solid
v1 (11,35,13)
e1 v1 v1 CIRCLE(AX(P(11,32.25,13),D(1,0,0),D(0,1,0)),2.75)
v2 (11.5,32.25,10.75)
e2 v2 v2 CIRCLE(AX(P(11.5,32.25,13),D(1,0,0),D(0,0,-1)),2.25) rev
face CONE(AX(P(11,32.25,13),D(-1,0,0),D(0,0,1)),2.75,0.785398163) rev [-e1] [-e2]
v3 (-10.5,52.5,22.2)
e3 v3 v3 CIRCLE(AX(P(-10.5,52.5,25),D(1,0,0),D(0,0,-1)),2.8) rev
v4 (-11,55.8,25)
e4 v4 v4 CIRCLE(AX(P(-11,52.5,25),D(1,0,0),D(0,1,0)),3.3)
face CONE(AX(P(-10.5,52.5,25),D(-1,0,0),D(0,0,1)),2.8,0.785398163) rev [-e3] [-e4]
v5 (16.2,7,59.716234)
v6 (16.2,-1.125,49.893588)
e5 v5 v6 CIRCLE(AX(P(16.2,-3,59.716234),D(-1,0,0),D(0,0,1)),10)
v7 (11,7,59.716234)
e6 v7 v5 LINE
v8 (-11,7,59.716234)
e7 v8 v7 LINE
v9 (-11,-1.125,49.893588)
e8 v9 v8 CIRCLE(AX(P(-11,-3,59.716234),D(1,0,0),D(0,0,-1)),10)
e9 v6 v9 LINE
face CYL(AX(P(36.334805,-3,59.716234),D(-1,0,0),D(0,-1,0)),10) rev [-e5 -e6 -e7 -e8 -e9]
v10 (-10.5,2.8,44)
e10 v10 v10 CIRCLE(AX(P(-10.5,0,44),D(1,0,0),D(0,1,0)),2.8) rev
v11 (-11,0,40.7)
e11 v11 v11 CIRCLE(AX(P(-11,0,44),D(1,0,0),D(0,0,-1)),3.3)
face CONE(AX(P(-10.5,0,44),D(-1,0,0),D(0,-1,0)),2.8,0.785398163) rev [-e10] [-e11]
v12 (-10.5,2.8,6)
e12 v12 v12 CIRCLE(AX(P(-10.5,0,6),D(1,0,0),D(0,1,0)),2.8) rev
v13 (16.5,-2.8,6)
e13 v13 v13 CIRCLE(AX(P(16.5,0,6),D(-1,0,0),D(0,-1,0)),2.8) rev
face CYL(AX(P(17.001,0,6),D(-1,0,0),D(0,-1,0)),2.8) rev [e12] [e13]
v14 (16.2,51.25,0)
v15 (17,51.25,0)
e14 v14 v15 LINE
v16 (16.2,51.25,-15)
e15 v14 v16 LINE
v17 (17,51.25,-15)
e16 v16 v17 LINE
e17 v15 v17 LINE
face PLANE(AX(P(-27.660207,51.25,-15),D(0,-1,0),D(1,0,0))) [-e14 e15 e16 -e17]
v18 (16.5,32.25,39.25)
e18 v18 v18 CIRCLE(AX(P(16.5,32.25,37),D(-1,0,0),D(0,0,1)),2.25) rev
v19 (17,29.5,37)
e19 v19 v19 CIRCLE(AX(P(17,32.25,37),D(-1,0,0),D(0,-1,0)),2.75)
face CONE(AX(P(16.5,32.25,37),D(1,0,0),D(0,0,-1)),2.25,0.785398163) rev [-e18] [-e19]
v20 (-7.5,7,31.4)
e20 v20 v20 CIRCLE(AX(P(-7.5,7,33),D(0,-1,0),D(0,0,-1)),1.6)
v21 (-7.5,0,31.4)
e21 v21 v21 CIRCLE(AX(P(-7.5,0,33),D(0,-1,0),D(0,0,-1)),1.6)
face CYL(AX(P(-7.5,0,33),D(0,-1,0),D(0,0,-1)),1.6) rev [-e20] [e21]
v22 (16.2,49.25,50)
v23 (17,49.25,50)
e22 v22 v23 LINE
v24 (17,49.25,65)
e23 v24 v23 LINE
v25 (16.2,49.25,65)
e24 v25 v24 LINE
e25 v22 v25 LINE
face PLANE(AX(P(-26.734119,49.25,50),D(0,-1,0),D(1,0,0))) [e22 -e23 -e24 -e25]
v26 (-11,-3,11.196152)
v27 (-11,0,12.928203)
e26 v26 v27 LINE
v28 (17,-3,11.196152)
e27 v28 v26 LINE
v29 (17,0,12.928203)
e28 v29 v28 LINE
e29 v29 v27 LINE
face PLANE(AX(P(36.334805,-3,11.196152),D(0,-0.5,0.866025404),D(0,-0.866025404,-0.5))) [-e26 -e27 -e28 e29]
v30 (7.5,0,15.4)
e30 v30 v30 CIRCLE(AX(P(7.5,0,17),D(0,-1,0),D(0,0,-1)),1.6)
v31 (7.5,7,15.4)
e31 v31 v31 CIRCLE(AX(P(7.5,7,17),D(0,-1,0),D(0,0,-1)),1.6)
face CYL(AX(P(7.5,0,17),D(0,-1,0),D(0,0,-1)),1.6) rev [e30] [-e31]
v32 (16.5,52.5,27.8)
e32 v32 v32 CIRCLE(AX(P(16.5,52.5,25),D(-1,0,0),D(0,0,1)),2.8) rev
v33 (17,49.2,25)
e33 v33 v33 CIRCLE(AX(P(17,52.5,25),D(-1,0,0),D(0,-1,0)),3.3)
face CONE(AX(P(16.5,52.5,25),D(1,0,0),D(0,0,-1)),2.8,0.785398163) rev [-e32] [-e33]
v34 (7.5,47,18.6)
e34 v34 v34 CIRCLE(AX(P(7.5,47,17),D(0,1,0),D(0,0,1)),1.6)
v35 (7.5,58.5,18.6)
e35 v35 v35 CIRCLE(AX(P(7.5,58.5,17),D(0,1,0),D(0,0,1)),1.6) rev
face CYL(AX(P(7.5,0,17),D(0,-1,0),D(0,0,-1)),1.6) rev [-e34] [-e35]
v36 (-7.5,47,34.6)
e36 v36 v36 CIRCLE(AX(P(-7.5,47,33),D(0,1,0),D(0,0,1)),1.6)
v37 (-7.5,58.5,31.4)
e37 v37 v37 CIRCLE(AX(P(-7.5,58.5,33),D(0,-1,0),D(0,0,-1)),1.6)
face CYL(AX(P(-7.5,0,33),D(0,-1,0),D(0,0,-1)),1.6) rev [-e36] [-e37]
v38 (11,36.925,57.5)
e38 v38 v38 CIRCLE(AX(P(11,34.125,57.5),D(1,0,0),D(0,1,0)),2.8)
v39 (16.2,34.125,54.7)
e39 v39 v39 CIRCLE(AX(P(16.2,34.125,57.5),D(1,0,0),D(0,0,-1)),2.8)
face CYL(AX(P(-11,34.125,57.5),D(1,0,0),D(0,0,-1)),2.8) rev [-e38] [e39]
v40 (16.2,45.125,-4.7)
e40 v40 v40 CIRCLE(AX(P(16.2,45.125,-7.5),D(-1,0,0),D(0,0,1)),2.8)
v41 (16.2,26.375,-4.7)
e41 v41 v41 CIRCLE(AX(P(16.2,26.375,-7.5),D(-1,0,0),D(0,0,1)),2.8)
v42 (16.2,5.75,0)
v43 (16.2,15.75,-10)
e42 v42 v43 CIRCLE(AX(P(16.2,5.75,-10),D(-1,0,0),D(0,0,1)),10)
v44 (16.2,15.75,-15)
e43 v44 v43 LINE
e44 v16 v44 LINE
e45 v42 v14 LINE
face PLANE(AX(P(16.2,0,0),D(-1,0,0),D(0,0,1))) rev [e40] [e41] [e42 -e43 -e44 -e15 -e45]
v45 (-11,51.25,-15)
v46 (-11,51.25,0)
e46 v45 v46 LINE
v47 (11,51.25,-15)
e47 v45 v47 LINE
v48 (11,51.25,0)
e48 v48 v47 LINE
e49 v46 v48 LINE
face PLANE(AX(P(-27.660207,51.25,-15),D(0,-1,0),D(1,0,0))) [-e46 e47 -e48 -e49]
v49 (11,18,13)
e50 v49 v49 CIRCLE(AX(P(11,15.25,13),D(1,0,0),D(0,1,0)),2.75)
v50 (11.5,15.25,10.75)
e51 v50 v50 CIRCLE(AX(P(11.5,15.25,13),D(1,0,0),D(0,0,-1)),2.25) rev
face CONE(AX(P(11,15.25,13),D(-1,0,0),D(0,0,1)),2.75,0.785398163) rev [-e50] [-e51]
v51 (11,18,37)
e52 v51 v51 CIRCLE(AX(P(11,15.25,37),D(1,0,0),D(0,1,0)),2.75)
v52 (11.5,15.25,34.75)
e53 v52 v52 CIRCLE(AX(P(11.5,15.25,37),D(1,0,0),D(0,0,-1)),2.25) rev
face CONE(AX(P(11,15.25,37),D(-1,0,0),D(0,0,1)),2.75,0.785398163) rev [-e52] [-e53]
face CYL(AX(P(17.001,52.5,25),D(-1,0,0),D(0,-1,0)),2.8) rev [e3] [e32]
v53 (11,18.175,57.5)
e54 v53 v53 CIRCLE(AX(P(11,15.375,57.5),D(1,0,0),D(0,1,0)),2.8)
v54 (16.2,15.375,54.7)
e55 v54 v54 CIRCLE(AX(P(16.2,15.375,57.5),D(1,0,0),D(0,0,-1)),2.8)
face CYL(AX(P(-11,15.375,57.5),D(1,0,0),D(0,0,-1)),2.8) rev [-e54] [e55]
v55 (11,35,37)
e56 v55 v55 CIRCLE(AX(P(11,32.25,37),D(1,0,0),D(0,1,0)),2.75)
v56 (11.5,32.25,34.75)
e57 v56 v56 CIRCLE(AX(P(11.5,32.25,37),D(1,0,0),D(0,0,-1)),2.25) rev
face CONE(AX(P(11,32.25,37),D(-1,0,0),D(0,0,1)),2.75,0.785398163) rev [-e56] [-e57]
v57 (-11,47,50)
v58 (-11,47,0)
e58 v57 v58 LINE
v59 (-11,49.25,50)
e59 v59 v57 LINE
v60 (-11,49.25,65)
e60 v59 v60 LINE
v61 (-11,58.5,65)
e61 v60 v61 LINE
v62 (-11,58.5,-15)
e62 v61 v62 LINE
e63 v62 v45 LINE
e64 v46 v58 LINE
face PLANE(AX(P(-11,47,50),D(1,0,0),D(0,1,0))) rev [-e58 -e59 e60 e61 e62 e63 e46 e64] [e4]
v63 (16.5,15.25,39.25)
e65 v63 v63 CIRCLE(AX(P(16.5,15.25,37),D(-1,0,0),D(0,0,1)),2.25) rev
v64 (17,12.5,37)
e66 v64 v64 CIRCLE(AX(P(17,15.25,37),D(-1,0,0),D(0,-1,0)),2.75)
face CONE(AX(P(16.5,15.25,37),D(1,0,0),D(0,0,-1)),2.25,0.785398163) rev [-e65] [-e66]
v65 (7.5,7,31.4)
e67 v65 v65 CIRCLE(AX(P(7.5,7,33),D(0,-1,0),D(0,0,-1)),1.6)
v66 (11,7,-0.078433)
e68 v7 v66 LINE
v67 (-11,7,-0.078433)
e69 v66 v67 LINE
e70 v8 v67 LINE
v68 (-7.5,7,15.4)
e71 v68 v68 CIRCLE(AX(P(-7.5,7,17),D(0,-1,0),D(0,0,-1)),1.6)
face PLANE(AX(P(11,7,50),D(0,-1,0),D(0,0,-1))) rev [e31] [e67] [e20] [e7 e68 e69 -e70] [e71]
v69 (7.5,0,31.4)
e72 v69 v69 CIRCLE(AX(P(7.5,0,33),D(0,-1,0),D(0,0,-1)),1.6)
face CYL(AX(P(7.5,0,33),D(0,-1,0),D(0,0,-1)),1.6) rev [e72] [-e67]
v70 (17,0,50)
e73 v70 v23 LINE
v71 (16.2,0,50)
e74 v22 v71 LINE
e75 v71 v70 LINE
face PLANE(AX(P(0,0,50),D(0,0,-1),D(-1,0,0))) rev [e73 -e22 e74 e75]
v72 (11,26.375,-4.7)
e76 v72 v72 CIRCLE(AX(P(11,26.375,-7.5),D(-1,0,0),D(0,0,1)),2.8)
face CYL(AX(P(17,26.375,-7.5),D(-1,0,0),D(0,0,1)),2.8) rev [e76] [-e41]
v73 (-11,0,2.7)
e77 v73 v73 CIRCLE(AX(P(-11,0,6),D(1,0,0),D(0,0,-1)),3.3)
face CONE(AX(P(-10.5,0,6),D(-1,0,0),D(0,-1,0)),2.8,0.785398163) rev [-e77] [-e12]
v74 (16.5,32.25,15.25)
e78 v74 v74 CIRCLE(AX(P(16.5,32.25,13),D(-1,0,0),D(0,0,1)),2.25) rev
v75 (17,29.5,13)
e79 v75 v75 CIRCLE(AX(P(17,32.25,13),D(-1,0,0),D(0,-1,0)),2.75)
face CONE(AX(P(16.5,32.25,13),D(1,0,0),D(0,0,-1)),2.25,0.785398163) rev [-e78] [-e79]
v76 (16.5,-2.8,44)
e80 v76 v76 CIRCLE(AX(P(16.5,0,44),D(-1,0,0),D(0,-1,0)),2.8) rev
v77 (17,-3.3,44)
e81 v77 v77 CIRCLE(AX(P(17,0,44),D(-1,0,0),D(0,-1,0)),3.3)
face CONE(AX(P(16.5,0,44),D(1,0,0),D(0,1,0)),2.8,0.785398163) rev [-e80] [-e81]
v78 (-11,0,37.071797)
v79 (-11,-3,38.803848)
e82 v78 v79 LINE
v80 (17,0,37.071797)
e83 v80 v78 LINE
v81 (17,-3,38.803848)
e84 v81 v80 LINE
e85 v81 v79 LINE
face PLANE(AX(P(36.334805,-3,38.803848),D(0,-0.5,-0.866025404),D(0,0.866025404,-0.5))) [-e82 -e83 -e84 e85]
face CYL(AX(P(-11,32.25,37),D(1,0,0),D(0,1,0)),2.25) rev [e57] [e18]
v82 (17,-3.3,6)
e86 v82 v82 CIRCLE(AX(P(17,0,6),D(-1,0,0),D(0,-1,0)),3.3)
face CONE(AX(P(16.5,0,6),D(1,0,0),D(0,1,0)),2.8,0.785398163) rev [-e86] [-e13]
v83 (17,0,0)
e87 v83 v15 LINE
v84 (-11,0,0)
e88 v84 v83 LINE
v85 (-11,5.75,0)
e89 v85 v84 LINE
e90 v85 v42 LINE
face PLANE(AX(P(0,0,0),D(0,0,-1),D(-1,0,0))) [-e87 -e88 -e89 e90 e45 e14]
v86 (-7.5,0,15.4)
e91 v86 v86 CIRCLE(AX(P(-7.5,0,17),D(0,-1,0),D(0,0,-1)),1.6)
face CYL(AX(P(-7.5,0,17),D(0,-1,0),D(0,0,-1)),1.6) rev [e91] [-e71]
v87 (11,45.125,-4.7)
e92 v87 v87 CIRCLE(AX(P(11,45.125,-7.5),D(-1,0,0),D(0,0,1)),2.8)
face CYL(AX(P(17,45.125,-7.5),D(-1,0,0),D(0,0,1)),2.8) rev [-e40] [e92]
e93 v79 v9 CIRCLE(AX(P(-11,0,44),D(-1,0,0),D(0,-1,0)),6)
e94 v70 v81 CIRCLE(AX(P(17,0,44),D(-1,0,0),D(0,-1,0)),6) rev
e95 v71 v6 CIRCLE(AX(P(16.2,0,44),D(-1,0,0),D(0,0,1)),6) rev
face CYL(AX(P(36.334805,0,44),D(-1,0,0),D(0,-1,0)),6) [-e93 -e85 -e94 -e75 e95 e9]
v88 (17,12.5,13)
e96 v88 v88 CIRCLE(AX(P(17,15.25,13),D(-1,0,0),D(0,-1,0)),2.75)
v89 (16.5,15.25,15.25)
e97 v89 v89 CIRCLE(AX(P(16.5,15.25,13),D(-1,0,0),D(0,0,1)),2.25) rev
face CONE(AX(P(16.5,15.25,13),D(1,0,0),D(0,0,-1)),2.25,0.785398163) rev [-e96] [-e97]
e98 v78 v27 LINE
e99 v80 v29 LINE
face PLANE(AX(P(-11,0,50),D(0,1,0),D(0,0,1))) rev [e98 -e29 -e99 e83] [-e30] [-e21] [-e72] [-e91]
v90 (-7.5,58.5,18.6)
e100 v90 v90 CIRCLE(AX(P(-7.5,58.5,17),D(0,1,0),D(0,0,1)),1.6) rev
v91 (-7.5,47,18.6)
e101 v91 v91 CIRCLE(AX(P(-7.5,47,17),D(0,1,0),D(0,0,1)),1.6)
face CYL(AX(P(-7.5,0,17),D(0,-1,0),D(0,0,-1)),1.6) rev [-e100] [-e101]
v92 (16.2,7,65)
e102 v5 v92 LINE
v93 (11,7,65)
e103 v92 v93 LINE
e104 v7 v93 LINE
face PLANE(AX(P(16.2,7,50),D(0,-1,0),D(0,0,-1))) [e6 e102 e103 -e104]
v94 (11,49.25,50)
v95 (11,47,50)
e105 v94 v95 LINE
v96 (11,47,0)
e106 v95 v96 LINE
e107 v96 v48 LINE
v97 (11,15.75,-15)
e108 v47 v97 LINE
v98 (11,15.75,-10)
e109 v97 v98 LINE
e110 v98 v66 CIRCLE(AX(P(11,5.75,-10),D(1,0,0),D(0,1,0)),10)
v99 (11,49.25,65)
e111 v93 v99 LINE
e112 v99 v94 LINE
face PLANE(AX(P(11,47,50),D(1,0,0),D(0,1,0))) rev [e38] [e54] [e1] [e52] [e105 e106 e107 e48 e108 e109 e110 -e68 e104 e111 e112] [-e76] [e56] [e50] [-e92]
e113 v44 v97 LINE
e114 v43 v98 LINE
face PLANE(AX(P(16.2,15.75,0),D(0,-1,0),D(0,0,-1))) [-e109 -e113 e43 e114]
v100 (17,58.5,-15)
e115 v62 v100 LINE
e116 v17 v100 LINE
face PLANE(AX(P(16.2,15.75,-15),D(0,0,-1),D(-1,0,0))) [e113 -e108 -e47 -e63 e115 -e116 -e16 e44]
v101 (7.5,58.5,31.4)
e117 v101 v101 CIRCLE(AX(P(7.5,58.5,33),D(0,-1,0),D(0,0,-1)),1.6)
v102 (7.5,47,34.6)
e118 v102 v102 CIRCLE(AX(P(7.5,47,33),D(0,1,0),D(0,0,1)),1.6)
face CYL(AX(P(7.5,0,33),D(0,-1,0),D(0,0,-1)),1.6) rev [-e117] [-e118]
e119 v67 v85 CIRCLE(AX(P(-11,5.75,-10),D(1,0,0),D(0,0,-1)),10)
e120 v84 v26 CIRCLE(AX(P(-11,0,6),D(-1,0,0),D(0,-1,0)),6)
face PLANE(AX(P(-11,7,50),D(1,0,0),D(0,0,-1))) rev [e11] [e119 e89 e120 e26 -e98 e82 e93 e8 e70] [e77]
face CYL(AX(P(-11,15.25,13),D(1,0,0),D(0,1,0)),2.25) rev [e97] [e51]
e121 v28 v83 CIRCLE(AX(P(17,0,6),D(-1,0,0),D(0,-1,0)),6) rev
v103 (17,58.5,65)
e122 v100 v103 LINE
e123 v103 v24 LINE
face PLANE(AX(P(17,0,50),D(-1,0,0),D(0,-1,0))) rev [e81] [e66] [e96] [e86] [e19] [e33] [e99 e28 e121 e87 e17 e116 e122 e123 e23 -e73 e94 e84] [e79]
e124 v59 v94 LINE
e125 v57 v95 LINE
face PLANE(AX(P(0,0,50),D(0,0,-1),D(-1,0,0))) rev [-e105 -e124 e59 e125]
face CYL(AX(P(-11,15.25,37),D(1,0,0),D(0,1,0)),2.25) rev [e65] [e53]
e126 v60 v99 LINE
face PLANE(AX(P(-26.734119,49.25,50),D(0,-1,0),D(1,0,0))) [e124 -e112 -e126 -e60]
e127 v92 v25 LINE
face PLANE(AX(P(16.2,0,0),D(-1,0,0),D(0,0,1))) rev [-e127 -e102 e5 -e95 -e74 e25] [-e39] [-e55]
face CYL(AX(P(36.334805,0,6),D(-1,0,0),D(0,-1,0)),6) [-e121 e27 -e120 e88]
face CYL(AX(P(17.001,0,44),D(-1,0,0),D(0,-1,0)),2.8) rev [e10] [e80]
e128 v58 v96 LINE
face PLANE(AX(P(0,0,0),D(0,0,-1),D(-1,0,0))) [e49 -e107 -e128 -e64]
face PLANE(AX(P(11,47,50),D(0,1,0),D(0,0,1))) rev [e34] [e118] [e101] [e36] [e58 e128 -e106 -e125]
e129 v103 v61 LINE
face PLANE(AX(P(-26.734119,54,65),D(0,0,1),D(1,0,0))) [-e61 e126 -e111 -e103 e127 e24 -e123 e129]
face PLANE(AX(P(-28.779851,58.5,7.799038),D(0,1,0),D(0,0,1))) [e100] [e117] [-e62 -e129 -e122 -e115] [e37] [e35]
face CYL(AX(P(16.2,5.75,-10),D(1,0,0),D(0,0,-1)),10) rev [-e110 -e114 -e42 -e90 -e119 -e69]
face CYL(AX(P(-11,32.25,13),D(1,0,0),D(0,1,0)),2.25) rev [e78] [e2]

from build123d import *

# Parameters (mm, degrees)
BOSS_EXTRUDE1_DEPTH        = 50
F_3_2_3_2_DIAMETER_HOLE1_D = 3.2
SKETCH5_R                  = 2.25
CUT_EXTRUDE1_DEPTH         = 79.74007874
SKETCH6_W                  = 15
SKETCH6_H                  = 4.75
BOSS_EXTRUDE2_DEPTH        = 28
SKETCH8_W                  = 12.2
SKETCH8_H                  = 80
BOSS_EXTRUDE3_DEPTH        = 25
SKETCH9_R                  = 2.75
CUT_EXTRUDE2_DEPTH         = 105.770033884
BOSS_EXTRUDE4_REACH        = 108.066
CUT_EXTRUDE3_REACH         = 108.066
SKETCH11_R                 = 2.8
CHAMFER1_SIZE              = 0.5
CUT_EXTRUDE4_DEPTH         = 104.806358187
SKETCH14_W                 = 15
SKETCH14_H                 = 40
BOSS_EXTRUDE5_DEPTH        = 5.2
SKETCH16_W                 = 15
SKETCH16_H                 = 17
CUT_EXTRUDE6_DEPTH         = 92.821838361
SKETCH18_W                 = 15
SKETCH18_H                 = 35.5
BOSS_EXTRUDE6_DEPTH        = 5.2
SKETCH20_W                 = 7.799038106
SKETCH20_H                 = 4.25
BOSS_EXTRUDE7_DEPTH        = 27.2
FILLET1_R                  = 10
SKETCH22_R                 = 2.8
CUT_EXTRUDE8_DEPTH         = 92.581056993
SKETCH24_R                 = 2.8
CUT_EXTRUDE9_DEPTH         = 91.173443984
BOSS_EXTRUDE9_START        = -28
BOSS_EXTRUDE9_DEPTH        = 28
CUT_EXTRUDE11_START        = 10
SKETCH29_R                 = 3.75
SKETCH29_R_2               = 1.6
CUT_EXTRUDE11_DEPTH        = 10
SKETCH28_W                 = 15
SKETCH28_H                 = 2.25
BOSS_EXTRUDE10_DEPTH       = 5.2
SKETCH30_W                 = 7.799038106
SKETCH30_H                 = 4.5
BOSS_EXTRUDE11_DEPTH       = 28
SKETCH31_W                 = 15
SKETCH31_H                 = 7.25
BOSS_EXTRUDE12_DEPTH       = 28
BOSS_EXTRUDE14_DEPTH       = 28
SKETCH33_R                 = 1.6
CUT_EXTRUDE12_DEPTH        = 86.574528921


with BuildPart() as part:
    # Sketch1 → Boss-Extrude1 (new body)
    with BuildSketch(Plane.XY):
        Polygon((-11, 0), (17, 0), (17, 54), (-11, 54), (-11, 47), (11, 47), (11, 7), (-11, 7), align=None)
    extrude(amount=BOSS_EXTRUDE1_DEPTH)

    # Ø3.2 (3.2) Diameter Hole1 (through all)
    with Locations(Plane(origin=(0, 0, 0), x_dir=(-1, 0, 0), z_dir=(0, -1, 0))):
        with Locations((-7.5, -17), (7.5, -17), (7.5, -33), (-7.5, -33)):
            Hole(F_3_2_3_2_DIAMETER_HOLE1_D / 2)

    # Sketch5 → Cut-Extrude1 (cut, through all)
    with BuildSketch(Plane(origin=(17, 0, 0), x_dir=(0, 0, -1), z_dir=(1, 0, 0))):
        with Locations(Location((-37, 32.25, 0), (0, 0, 90))):
            Circle(SKETCH5_R)
        with Locations(Location((-13, 32.25, 0), (0, 0, 90))):
            Circle(SKETCH5_R)
        with Locations(Location((-37, 15.25, 0), (0, 0, 90))):
            Circle(SKETCH5_R)
        with Locations(Location((-13, 15.25, 0), (0, 0, 90))):
            Circle(SKETCH5_R)
    extrude(amount=-CUT_EXTRUDE1_DEPTH, mode=Mode.SUBTRACT)

    # Sketch6 → Boss-Extrude2 (add)
    with BuildSketch(Plane(origin=(17, 0, 0), x_dir=(0, 0, -1), z_dir=(1, 0, 0))):
        with Locations((-57.5, 51.625)):
            Rectangle(SKETCH6_W, SKETCH6_H)
        with Locations((7.5, 51.625)):
            Rectangle(SKETCH6_W, SKETCH6_H)
    extrude(amount=-BOSS_EXTRUDE2_DEPTH)

    # Sketch8 → Boss-Extrude3 (add)
    with BuildSketch(Plane(origin=(0, 54, 0), x_dir=(1, 0, 0), z_dir=(0, 1, 0))):
        with Locations((0.5, -25)):
            Rectangle(SKETCH8_W, SKETCH8_H)
    extrude(amount=BOSS_EXTRUDE3_DEPTH)

    # Sketch9 → Cut-Extrude2 (cut, through all)
    with BuildSketch(Plane.ZY.offset(5.6)):
        with Locations((-7.5, 66.2)):
            Circle(SKETCH9_R)
        with Locations((57.5, 66.2)):
            Circle(SKETCH9_R)
    extrude(amount=-CUT_EXTRUDE2_DEPTH, mode=Mode.SUBTRACT)

    # Boss-Extrude4: up to this face of the body (flat: up to its plane)
    boss_extrude4_end = Plane(part.part.faces().sort_by_distance((17, 28.337162775, 25))[0])
    # Sketch10 → Boss-Extrude4 (add, up to the picked face)
    with BuildSketch(Plane.ZY.offset(11), mode=Mode.PRIVATE) as boss_extrude4_sk1:
        with BuildLine():
            Line((11.196152423, -3), (12.92820323, 0))
            Line((12.92820323, 0), (0, 0))
            ThreePointArc((0, 0), (4.447085729, -5.795554958), (11.196152423, -3))
        make_face()
    boss_extrude4_tool1 = split(extrude(boss_extrude4_sk1.sketch, amount=-BOSS_EXTRUDE4_REACH, mode=Mode.PRIVATE), bisect_by=boss_extrude4_end, keep=Keep.BOTH, mode=Mode.PRIVATE)
    # Sketch10 → Boss-Extrude4 (add, up to the picked face)
    with BuildSketch(Plane.ZY.offset(11), mode=Mode.PRIVATE) as boss_extrude4_sk2:
        with BuildLine():
            Line((22, 57.696152423), (15.598076211, 54))
            Line((15.598076211, 54), (34.401923789, 54))
            Line((34.401923789, 54), (28, 57.696152423))
            ThreePointArc((28, 57.696152423), (25, 58.5), (22, 57.696152423))
        make_face()
    boss_extrude4_tool2 = split(extrude(boss_extrude4_sk2.sketch, amount=-BOSS_EXTRUDE4_REACH, mode=Mode.PRIVATE), bisect_by=boss_extrude4_end, keep=Keep.BOTH, mode=Mode.PRIVATE)
    # Sketch10 → Boss-Extrude4 (add, up to the picked face)
    with BuildSketch(Plane.ZY.offset(11), mode=Mode.PRIVATE) as boss_extrude4_sk3:
        with BuildLine():
            Line((38.803847577, -3), (37.07179677, 0))
            Line((37.07179677, 0), (50, 0))
            ThreePointArc((50, 0), (45.552914271, -5.795554958), (38.803847577, -3))
        make_face()
    boss_extrude4_tool3 = split(extrude(boss_extrude4_sk3.sketch, amount=-BOSS_EXTRUDE4_REACH, mode=Mode.PRIVATE), bisect_by=boss_extrude4_end, keep=Keep.BOTH, mode=Mode.PRIVATE)
    add(boss_extrude4_tool1.solids().sort_by(Axis((-11, -2.516615, 6.104318), (1, 0, 0)))[0])
    add(boss_extrude4_tool2.solids().sort_by(Axis((-11, 55.695428, 25), (1, 0, 0)))[0])
    add(boss_extrude4_tool3.solids().sort_by(Axis((-11, -2.516615, 43.895682), (1, 0, 0)))[0])

    # Sketch11 → Cut-Extrude3 (cut, up to next)
    with BuildSketch(Plane.ZY.offset(11), mode=Mode.PRIVATE) as cut_extrude3_sk1:
        with Locations(Location((25, 52.5, 0), (0, 0, 270))):
            Circle(SKETCH11_R)
    cut_extrude3_tool1 = extrude(cut_extrude3_sk1.sketch, amount=-CUT_EXTRUDE3_REACH, mode=Mode.PRIVATE) & part.part
    # Sketch11 → Cut-Extrude3 (cut, up to next)
    with BuildSketch(Plane.ZY.offset(11), mode=Mode.PRIVATE) as cut_extrude3_sk2:
        with Locations(Location((44, 0, 0), (0, 0, 270))):
            Circle(SKETCH11_R)
    cut_extrude3_tool2 = extrude(cut_extrude3_sk2.sketch, amount=-CUT_EXTRUDE3_REACH, mode=Mode.PRIVATE) & part.part
    # Sketch11 → Cut-Extrude3 (cut, up to next)
    with BuildSketch(Plane.ZY.offset(11), mode=Mode.PRIVATE) as cut_extrude3_sk3:
        with Locations(Location((6, 0, 0), (0, 0, 270))):
            Circle(SKETCH11_R)
    cut_extrude3_tool3 = extrude(cut_extrude3_sk3.sketch, amount=-CUT_EXTRUDE3_REACH, mode=Mode.PRIVATE) & part.part
    add(cut_extrude3_tool1.solids().sort_by_distance((-11, 52.5, 25))[0], mode=Mode.SUBTRACT)
    add(cut_extrude3_tool2.solids().sort_by_distance((-11, 0, 44))[0], mode=Mode.SUBTRACT)
    add(cut_extrude3_tool3.solids().sort_by_distance((-11, 0, 6))[0], mode=Mode.SUBTRACT)

    # Chamfer1
    chamfer1_edges = [part.edges().sort_by_distance(p)[0] for p in [
        (6.6, 66.2, -10.25),
        (-5.6, 66.2, -10.25),
        (6.6, 66.2, 54.75),
        (-5.6, 66.2, 54.75),
        (-11, 55.3, 25),
        (17, 55.3, 25),
        (-11, 2.8, 44),
        (17, 2.8, 44),
        (-11, 2.8, 6),
        (17, 2.8, 6),
        (11, 30, 13),
        (17, 30, 13),
        (11, 13, 37),
        (17, 13, 37),
        (11, 13, 13),
        (17, 13, 13),
        (11, 30, 37),
        (17, 30, 37),
    ]]
    chamfer(chamfer1_edges, length=CHAMFER1_SIZE)

    # Sketch12 → Cut-Extrude4 (cut, through all)
    with BuildSketch(Plane(origin=(6.6, 0, 0), x_dir=(0, 0, -1), z_dir=(1, 0, 0))):
        with BuildLine():
            Line((-65, 54), (-34.401923789, 54))
            Line((-34.401923789, 54), (-28, 57.696152423))
            ThreePointArc((-28, 57.696152423), (-25, 58.5), (-22, 57.696152423))
            Line((-22, 57.696152423), (-15.598076211, 54))
            Line((-15.598076211, 54), (15, 54))
            Line((15, 54), (15, 79))
            Line((15, 79), (-65, 79))
            Line((-65, 79), (-65, 54))
        make_face()
    extrude(amount=-CUT_EXTRUDE4_DEPTH, mode=Mode.SUBTRACT)

    # Sketch14 → Boss-Extrude5 (add)
    with BuildSketch(Plane.ZY.offset(-11)):
        with Locations((57.5, 27)):
            Rectangle(SKETCH14_W, SKETCH14_H)
    extrude(amount=-BOSS_EXTRUDE5_DEPTH)

    # Sketch16 → Cut-Extrude6 (cut, through all)
    with BuildSketch(Plane(origin=(17, 0, 0), x_dir=(0, 0, -1), z_dir=(1, 0, 0))):
        with Locations((7.5, 45.5)):
            Rectangle(SKETCH16_W, SKETCH16_H)
    extrude(amount=-CUT_EXTRUDE6_DEPTH, mode=Mode.SUBTRACT)

    # Sketch18 → Boss-Extrude6 (add)
    with BuildSketch(Plane.ZY.offset(-11)):
        with Locations((-7.5, 33.5)):
            Rectangle(SKETCH18_W, SKETCH18_H)
    extrude(amount=-BOSS_EXTRUDE6_DEPTH)

    # Sketch20 → Boss-Extrude7 (add)
    with BuildSketch(Plane.ZY.offset(11)):
        with Locations((3.899519053, 56.125)):
            Rectangle(SKETCH20_W, SKETCH20_H)
    extrude(amount=-BOSS_EXTRUDE7_DEPTH)

    # Fillet1
    # the kernel refuses this fillet: 10 mm, written as the material it adds along each edge
    with BuildSketch(Plane(origin=(-13.290584114, 7, 50), x_dir=(0, 0, 1), z_dir=(1, 0, 0))) as fillet1_piece_1_section:
        with BuildLine():
            CenterArc((9.716233646, 10), FILLET1_R, 190.806922875, 79.193077125)
            Line((-0.106412383, 8.125), (-1.088676986, 7.9375))
            ThreePointArc((-1.088676986, 7.9375), (-1, 7), (-1, 0))
            Line((-1, 0), (0, -1))
            Line((0, -1), (9.716233646, -1))
            Line((9.716233646, -1), (9.716233646, 0))
        make_face()
    fillet1_piece_1 = extrude(amount=29.490584114, mode=Mode.PRIVATE)
    fillet1_piece_1 = split(fillet1_piece_1, bisect_by=Plane(origin=(-11, 4.720928539, 53.329711705), z_dir=(1, 0, 0)), keep=Keep.TOP, mode=Mode.PRIVATE)
    fillet1_piece_1 = split(fillet1_piece_1, bisect_by=Plane(origin=(0, 7, 53.329711705), z_dir=(0, -1, 0)), keep=Keep.TOP, mode=Mode.PRIVATE)
    add(fillet1_piece_1)
    with BuildSketch(Plane(origin=(-14, 15.75, 0), x_dir=(0, 0, -1), z_dir=(1, 0, 0))) as fillet1_piece_2_section:
        with BuildLine():
            CenterArc((FILLET1_R, -FILLET1_R), FILLET1_R, 90, 90)
            Line((0, -FILLET1_R), (0, 0))
            Line((0, 0), (FILLET1_R, 0))
        make_face()
    fillet1_piece_2 = extrude(amount=30.2, mode=Mode.PRIVATE)
    fillet1_piece_2 = split(fillet1_piece_2, bisect_by=Plane(origin=(-11, 6.687745624, -0.023513871), z_dir=(1, 0, 0)), keep=Keep.TOP, mode=Mode.PRIVATE)
    fillet1_piece_2 = split(fillet1_piece_2, bisect_by=Plane(origin=(0, 7, -0.023513871), z_dir=(0, -1, 0)), keep=Keep.TOP, mode=Mode.PRIVATE)
    add(fillet1_piece_2)
    with BuildSketch(Plane(origin=(11, 15.75, 0), x_dir=(0, 0, -1), z_dir=(1, 0, 0))) as fillet1_piece_3:
        with BuildLine():
            CenterArc((FILLET1_R, -FILLET1_R), FILLET1_R, 90, 90)
            Line((0, -FILLET1_R), (0, 0))
            Line((0, 0), (FILLET1_R, 0))
        make_face()
    extrude(amount=5.2)

    # Sketch22 → Cut-Extrude8 (cut, through all)
    with BuildSketch(Plane(origin=(16.2, 0, 0), x_dir=(0, 0, -1), z_dir=(1, 0, 0))):
        with Locations((-57.5, 34.125)):
            Circle(SKETCH22_R)
        with Locations((-57.5, 15.375)):
            Circle(SKETCH22_R)
    extrude(amount=-CUT_EXTRUDE8_DEPTH, mode=Mode.SUBTRACT)

    # Sketch24 → Cut-Extrude9 (cut, through all)
    with BuildSketch(Plane.ZY.offset(-11)):
        with Locations((-7.5, 45.125)):
            Circle(SKETCH24_R)
        with Locations((-7.5, 26.375)):
            Circle(SKETCH24_R)
    extrude(amount=-CUT_EXTRUDE9_DEPTH, mode=Mode.SUBTRACT)

    # Sketch26 → Boss-Extrude9 (add)
    with BuildSketch(Plane(origin=(17, 0, 0), x_dir=(0, 0, -1), z_dir=(1, 0, 0)).offset(BOSS_EXTRUDE9_START)):
        with BuildLine():
            Line((-7.799038106, 58.5), (-25, 58.5))
            ThreePointArc((-25, 58.5), (-23.447085729, 58.295554958), (-22, 57.696152423))
            Line((-22, 57.696152423), (-15.598076211, 54))
            Line((-15.598076211, 54), (-7.799038106, 54))
            Line((-7.799038106, 54), (-7.799038106, 58.5))
        make_face()
    extrude(amount=BOSS_EXTRUDE9_DEPTH)

    # Sketch29 → Cut-Extrude11 (cut)
    with BuildSketch(Plane(origin=(0, 54, 0), x_dir=(1, 0, 0), z_dir=(0, 1, 0)).offset(CUT_EXTRUDE11_START)):
        with Locations((-7.5, -33)):
            Circle(SKETCH29_R)
        with Locations((7.5, -33)):
            Circle(SKETCH29_R)
        with Locations(Location((-7.5, -17, 0), (0, 0, 270))):
            Circle(SKETCH29_R_2)
        with Locations(Location((7.5, -17, 0), (0, 0, 270))):
            Circle(SKETCH29_R_2)
    extrude(amount=-CUT_EXTRUDE11_DEPTH, mode=Mode.SUBTRACT)

    # Sketch28 → Boss-Extrude10 (add)
    with BuildSketch(Plane(origin=(16.2, 0, 0), x_dir=(0, 0, -1), z_dir=(1, 0, 0))):
        with Locations((-57.5, 48.125)):
            Rectangle(SKETCH28_W, SKETCH28_H)
    extrude(amount=-BOSS_EXTRUDE10_DEPTH)

    # Sketch30 → Boss-Extrude11 (add)
    with BuildSketch(Plane(origin=(17, 0, 0), x_dir=(0, 0, -1), z_dir=(1, 0, 0))):
        with Locations((-3.899519053, 56.25)):
            Rectangle(SKETCH30_W, SKETCH30_H)
    extrude(amount=-BOSS_EXTRUDE11_DEPTH)

    # Sketch31 → Boss-Extrude12 (add)
    with BuildSketch(Plane(origin=(17, 0, 0), x_dir=(0, 0, -1), z_dir=(1, 0, 0))):
        with Locations((7.5, 54.875)):
            Rectangle(SKETCH31_W, SKETCH31_H)
    extrude(amount=-BOSS_EXTRUDE12_DEPTH)

    # Sketch32 → Boss-Extrude14 (add)
    with BuildSketch(Plane.ZY.offset(11)):
        with BuildLine():
            Line((25, 58.5), (25, 55.8))
            ThreePointArc((25, 55.8), (26.723368794, 55.314249456), (27.939387691, 54))
            Line((27.939387691, 54), (65, 54))
            Line((65, 54), (65, 58.5))
            Line((65, 58.5), (25, 58.5))
        make_face()
    extrude(amount=-BOSS_EXTRUDE14_DEPTH)

    # Sketch33 → Cut-Extrude12 (cut, through all)
    with BuildSketch(Plane.XZ.offset(-47)):
        with Locations(Location((-7.5, 33, 0), (0, 0, 270))):
            Circle(SKETCH33_R)
        with Locations(Location((7.5, 33, 0), (0, 0, 270))):
            Circle(SKETCH33_R)
    extrude(amount=-CUT_EXTRUDE12_DEPTH, mode=Mode.SUBTRACT)


solid = part.part
